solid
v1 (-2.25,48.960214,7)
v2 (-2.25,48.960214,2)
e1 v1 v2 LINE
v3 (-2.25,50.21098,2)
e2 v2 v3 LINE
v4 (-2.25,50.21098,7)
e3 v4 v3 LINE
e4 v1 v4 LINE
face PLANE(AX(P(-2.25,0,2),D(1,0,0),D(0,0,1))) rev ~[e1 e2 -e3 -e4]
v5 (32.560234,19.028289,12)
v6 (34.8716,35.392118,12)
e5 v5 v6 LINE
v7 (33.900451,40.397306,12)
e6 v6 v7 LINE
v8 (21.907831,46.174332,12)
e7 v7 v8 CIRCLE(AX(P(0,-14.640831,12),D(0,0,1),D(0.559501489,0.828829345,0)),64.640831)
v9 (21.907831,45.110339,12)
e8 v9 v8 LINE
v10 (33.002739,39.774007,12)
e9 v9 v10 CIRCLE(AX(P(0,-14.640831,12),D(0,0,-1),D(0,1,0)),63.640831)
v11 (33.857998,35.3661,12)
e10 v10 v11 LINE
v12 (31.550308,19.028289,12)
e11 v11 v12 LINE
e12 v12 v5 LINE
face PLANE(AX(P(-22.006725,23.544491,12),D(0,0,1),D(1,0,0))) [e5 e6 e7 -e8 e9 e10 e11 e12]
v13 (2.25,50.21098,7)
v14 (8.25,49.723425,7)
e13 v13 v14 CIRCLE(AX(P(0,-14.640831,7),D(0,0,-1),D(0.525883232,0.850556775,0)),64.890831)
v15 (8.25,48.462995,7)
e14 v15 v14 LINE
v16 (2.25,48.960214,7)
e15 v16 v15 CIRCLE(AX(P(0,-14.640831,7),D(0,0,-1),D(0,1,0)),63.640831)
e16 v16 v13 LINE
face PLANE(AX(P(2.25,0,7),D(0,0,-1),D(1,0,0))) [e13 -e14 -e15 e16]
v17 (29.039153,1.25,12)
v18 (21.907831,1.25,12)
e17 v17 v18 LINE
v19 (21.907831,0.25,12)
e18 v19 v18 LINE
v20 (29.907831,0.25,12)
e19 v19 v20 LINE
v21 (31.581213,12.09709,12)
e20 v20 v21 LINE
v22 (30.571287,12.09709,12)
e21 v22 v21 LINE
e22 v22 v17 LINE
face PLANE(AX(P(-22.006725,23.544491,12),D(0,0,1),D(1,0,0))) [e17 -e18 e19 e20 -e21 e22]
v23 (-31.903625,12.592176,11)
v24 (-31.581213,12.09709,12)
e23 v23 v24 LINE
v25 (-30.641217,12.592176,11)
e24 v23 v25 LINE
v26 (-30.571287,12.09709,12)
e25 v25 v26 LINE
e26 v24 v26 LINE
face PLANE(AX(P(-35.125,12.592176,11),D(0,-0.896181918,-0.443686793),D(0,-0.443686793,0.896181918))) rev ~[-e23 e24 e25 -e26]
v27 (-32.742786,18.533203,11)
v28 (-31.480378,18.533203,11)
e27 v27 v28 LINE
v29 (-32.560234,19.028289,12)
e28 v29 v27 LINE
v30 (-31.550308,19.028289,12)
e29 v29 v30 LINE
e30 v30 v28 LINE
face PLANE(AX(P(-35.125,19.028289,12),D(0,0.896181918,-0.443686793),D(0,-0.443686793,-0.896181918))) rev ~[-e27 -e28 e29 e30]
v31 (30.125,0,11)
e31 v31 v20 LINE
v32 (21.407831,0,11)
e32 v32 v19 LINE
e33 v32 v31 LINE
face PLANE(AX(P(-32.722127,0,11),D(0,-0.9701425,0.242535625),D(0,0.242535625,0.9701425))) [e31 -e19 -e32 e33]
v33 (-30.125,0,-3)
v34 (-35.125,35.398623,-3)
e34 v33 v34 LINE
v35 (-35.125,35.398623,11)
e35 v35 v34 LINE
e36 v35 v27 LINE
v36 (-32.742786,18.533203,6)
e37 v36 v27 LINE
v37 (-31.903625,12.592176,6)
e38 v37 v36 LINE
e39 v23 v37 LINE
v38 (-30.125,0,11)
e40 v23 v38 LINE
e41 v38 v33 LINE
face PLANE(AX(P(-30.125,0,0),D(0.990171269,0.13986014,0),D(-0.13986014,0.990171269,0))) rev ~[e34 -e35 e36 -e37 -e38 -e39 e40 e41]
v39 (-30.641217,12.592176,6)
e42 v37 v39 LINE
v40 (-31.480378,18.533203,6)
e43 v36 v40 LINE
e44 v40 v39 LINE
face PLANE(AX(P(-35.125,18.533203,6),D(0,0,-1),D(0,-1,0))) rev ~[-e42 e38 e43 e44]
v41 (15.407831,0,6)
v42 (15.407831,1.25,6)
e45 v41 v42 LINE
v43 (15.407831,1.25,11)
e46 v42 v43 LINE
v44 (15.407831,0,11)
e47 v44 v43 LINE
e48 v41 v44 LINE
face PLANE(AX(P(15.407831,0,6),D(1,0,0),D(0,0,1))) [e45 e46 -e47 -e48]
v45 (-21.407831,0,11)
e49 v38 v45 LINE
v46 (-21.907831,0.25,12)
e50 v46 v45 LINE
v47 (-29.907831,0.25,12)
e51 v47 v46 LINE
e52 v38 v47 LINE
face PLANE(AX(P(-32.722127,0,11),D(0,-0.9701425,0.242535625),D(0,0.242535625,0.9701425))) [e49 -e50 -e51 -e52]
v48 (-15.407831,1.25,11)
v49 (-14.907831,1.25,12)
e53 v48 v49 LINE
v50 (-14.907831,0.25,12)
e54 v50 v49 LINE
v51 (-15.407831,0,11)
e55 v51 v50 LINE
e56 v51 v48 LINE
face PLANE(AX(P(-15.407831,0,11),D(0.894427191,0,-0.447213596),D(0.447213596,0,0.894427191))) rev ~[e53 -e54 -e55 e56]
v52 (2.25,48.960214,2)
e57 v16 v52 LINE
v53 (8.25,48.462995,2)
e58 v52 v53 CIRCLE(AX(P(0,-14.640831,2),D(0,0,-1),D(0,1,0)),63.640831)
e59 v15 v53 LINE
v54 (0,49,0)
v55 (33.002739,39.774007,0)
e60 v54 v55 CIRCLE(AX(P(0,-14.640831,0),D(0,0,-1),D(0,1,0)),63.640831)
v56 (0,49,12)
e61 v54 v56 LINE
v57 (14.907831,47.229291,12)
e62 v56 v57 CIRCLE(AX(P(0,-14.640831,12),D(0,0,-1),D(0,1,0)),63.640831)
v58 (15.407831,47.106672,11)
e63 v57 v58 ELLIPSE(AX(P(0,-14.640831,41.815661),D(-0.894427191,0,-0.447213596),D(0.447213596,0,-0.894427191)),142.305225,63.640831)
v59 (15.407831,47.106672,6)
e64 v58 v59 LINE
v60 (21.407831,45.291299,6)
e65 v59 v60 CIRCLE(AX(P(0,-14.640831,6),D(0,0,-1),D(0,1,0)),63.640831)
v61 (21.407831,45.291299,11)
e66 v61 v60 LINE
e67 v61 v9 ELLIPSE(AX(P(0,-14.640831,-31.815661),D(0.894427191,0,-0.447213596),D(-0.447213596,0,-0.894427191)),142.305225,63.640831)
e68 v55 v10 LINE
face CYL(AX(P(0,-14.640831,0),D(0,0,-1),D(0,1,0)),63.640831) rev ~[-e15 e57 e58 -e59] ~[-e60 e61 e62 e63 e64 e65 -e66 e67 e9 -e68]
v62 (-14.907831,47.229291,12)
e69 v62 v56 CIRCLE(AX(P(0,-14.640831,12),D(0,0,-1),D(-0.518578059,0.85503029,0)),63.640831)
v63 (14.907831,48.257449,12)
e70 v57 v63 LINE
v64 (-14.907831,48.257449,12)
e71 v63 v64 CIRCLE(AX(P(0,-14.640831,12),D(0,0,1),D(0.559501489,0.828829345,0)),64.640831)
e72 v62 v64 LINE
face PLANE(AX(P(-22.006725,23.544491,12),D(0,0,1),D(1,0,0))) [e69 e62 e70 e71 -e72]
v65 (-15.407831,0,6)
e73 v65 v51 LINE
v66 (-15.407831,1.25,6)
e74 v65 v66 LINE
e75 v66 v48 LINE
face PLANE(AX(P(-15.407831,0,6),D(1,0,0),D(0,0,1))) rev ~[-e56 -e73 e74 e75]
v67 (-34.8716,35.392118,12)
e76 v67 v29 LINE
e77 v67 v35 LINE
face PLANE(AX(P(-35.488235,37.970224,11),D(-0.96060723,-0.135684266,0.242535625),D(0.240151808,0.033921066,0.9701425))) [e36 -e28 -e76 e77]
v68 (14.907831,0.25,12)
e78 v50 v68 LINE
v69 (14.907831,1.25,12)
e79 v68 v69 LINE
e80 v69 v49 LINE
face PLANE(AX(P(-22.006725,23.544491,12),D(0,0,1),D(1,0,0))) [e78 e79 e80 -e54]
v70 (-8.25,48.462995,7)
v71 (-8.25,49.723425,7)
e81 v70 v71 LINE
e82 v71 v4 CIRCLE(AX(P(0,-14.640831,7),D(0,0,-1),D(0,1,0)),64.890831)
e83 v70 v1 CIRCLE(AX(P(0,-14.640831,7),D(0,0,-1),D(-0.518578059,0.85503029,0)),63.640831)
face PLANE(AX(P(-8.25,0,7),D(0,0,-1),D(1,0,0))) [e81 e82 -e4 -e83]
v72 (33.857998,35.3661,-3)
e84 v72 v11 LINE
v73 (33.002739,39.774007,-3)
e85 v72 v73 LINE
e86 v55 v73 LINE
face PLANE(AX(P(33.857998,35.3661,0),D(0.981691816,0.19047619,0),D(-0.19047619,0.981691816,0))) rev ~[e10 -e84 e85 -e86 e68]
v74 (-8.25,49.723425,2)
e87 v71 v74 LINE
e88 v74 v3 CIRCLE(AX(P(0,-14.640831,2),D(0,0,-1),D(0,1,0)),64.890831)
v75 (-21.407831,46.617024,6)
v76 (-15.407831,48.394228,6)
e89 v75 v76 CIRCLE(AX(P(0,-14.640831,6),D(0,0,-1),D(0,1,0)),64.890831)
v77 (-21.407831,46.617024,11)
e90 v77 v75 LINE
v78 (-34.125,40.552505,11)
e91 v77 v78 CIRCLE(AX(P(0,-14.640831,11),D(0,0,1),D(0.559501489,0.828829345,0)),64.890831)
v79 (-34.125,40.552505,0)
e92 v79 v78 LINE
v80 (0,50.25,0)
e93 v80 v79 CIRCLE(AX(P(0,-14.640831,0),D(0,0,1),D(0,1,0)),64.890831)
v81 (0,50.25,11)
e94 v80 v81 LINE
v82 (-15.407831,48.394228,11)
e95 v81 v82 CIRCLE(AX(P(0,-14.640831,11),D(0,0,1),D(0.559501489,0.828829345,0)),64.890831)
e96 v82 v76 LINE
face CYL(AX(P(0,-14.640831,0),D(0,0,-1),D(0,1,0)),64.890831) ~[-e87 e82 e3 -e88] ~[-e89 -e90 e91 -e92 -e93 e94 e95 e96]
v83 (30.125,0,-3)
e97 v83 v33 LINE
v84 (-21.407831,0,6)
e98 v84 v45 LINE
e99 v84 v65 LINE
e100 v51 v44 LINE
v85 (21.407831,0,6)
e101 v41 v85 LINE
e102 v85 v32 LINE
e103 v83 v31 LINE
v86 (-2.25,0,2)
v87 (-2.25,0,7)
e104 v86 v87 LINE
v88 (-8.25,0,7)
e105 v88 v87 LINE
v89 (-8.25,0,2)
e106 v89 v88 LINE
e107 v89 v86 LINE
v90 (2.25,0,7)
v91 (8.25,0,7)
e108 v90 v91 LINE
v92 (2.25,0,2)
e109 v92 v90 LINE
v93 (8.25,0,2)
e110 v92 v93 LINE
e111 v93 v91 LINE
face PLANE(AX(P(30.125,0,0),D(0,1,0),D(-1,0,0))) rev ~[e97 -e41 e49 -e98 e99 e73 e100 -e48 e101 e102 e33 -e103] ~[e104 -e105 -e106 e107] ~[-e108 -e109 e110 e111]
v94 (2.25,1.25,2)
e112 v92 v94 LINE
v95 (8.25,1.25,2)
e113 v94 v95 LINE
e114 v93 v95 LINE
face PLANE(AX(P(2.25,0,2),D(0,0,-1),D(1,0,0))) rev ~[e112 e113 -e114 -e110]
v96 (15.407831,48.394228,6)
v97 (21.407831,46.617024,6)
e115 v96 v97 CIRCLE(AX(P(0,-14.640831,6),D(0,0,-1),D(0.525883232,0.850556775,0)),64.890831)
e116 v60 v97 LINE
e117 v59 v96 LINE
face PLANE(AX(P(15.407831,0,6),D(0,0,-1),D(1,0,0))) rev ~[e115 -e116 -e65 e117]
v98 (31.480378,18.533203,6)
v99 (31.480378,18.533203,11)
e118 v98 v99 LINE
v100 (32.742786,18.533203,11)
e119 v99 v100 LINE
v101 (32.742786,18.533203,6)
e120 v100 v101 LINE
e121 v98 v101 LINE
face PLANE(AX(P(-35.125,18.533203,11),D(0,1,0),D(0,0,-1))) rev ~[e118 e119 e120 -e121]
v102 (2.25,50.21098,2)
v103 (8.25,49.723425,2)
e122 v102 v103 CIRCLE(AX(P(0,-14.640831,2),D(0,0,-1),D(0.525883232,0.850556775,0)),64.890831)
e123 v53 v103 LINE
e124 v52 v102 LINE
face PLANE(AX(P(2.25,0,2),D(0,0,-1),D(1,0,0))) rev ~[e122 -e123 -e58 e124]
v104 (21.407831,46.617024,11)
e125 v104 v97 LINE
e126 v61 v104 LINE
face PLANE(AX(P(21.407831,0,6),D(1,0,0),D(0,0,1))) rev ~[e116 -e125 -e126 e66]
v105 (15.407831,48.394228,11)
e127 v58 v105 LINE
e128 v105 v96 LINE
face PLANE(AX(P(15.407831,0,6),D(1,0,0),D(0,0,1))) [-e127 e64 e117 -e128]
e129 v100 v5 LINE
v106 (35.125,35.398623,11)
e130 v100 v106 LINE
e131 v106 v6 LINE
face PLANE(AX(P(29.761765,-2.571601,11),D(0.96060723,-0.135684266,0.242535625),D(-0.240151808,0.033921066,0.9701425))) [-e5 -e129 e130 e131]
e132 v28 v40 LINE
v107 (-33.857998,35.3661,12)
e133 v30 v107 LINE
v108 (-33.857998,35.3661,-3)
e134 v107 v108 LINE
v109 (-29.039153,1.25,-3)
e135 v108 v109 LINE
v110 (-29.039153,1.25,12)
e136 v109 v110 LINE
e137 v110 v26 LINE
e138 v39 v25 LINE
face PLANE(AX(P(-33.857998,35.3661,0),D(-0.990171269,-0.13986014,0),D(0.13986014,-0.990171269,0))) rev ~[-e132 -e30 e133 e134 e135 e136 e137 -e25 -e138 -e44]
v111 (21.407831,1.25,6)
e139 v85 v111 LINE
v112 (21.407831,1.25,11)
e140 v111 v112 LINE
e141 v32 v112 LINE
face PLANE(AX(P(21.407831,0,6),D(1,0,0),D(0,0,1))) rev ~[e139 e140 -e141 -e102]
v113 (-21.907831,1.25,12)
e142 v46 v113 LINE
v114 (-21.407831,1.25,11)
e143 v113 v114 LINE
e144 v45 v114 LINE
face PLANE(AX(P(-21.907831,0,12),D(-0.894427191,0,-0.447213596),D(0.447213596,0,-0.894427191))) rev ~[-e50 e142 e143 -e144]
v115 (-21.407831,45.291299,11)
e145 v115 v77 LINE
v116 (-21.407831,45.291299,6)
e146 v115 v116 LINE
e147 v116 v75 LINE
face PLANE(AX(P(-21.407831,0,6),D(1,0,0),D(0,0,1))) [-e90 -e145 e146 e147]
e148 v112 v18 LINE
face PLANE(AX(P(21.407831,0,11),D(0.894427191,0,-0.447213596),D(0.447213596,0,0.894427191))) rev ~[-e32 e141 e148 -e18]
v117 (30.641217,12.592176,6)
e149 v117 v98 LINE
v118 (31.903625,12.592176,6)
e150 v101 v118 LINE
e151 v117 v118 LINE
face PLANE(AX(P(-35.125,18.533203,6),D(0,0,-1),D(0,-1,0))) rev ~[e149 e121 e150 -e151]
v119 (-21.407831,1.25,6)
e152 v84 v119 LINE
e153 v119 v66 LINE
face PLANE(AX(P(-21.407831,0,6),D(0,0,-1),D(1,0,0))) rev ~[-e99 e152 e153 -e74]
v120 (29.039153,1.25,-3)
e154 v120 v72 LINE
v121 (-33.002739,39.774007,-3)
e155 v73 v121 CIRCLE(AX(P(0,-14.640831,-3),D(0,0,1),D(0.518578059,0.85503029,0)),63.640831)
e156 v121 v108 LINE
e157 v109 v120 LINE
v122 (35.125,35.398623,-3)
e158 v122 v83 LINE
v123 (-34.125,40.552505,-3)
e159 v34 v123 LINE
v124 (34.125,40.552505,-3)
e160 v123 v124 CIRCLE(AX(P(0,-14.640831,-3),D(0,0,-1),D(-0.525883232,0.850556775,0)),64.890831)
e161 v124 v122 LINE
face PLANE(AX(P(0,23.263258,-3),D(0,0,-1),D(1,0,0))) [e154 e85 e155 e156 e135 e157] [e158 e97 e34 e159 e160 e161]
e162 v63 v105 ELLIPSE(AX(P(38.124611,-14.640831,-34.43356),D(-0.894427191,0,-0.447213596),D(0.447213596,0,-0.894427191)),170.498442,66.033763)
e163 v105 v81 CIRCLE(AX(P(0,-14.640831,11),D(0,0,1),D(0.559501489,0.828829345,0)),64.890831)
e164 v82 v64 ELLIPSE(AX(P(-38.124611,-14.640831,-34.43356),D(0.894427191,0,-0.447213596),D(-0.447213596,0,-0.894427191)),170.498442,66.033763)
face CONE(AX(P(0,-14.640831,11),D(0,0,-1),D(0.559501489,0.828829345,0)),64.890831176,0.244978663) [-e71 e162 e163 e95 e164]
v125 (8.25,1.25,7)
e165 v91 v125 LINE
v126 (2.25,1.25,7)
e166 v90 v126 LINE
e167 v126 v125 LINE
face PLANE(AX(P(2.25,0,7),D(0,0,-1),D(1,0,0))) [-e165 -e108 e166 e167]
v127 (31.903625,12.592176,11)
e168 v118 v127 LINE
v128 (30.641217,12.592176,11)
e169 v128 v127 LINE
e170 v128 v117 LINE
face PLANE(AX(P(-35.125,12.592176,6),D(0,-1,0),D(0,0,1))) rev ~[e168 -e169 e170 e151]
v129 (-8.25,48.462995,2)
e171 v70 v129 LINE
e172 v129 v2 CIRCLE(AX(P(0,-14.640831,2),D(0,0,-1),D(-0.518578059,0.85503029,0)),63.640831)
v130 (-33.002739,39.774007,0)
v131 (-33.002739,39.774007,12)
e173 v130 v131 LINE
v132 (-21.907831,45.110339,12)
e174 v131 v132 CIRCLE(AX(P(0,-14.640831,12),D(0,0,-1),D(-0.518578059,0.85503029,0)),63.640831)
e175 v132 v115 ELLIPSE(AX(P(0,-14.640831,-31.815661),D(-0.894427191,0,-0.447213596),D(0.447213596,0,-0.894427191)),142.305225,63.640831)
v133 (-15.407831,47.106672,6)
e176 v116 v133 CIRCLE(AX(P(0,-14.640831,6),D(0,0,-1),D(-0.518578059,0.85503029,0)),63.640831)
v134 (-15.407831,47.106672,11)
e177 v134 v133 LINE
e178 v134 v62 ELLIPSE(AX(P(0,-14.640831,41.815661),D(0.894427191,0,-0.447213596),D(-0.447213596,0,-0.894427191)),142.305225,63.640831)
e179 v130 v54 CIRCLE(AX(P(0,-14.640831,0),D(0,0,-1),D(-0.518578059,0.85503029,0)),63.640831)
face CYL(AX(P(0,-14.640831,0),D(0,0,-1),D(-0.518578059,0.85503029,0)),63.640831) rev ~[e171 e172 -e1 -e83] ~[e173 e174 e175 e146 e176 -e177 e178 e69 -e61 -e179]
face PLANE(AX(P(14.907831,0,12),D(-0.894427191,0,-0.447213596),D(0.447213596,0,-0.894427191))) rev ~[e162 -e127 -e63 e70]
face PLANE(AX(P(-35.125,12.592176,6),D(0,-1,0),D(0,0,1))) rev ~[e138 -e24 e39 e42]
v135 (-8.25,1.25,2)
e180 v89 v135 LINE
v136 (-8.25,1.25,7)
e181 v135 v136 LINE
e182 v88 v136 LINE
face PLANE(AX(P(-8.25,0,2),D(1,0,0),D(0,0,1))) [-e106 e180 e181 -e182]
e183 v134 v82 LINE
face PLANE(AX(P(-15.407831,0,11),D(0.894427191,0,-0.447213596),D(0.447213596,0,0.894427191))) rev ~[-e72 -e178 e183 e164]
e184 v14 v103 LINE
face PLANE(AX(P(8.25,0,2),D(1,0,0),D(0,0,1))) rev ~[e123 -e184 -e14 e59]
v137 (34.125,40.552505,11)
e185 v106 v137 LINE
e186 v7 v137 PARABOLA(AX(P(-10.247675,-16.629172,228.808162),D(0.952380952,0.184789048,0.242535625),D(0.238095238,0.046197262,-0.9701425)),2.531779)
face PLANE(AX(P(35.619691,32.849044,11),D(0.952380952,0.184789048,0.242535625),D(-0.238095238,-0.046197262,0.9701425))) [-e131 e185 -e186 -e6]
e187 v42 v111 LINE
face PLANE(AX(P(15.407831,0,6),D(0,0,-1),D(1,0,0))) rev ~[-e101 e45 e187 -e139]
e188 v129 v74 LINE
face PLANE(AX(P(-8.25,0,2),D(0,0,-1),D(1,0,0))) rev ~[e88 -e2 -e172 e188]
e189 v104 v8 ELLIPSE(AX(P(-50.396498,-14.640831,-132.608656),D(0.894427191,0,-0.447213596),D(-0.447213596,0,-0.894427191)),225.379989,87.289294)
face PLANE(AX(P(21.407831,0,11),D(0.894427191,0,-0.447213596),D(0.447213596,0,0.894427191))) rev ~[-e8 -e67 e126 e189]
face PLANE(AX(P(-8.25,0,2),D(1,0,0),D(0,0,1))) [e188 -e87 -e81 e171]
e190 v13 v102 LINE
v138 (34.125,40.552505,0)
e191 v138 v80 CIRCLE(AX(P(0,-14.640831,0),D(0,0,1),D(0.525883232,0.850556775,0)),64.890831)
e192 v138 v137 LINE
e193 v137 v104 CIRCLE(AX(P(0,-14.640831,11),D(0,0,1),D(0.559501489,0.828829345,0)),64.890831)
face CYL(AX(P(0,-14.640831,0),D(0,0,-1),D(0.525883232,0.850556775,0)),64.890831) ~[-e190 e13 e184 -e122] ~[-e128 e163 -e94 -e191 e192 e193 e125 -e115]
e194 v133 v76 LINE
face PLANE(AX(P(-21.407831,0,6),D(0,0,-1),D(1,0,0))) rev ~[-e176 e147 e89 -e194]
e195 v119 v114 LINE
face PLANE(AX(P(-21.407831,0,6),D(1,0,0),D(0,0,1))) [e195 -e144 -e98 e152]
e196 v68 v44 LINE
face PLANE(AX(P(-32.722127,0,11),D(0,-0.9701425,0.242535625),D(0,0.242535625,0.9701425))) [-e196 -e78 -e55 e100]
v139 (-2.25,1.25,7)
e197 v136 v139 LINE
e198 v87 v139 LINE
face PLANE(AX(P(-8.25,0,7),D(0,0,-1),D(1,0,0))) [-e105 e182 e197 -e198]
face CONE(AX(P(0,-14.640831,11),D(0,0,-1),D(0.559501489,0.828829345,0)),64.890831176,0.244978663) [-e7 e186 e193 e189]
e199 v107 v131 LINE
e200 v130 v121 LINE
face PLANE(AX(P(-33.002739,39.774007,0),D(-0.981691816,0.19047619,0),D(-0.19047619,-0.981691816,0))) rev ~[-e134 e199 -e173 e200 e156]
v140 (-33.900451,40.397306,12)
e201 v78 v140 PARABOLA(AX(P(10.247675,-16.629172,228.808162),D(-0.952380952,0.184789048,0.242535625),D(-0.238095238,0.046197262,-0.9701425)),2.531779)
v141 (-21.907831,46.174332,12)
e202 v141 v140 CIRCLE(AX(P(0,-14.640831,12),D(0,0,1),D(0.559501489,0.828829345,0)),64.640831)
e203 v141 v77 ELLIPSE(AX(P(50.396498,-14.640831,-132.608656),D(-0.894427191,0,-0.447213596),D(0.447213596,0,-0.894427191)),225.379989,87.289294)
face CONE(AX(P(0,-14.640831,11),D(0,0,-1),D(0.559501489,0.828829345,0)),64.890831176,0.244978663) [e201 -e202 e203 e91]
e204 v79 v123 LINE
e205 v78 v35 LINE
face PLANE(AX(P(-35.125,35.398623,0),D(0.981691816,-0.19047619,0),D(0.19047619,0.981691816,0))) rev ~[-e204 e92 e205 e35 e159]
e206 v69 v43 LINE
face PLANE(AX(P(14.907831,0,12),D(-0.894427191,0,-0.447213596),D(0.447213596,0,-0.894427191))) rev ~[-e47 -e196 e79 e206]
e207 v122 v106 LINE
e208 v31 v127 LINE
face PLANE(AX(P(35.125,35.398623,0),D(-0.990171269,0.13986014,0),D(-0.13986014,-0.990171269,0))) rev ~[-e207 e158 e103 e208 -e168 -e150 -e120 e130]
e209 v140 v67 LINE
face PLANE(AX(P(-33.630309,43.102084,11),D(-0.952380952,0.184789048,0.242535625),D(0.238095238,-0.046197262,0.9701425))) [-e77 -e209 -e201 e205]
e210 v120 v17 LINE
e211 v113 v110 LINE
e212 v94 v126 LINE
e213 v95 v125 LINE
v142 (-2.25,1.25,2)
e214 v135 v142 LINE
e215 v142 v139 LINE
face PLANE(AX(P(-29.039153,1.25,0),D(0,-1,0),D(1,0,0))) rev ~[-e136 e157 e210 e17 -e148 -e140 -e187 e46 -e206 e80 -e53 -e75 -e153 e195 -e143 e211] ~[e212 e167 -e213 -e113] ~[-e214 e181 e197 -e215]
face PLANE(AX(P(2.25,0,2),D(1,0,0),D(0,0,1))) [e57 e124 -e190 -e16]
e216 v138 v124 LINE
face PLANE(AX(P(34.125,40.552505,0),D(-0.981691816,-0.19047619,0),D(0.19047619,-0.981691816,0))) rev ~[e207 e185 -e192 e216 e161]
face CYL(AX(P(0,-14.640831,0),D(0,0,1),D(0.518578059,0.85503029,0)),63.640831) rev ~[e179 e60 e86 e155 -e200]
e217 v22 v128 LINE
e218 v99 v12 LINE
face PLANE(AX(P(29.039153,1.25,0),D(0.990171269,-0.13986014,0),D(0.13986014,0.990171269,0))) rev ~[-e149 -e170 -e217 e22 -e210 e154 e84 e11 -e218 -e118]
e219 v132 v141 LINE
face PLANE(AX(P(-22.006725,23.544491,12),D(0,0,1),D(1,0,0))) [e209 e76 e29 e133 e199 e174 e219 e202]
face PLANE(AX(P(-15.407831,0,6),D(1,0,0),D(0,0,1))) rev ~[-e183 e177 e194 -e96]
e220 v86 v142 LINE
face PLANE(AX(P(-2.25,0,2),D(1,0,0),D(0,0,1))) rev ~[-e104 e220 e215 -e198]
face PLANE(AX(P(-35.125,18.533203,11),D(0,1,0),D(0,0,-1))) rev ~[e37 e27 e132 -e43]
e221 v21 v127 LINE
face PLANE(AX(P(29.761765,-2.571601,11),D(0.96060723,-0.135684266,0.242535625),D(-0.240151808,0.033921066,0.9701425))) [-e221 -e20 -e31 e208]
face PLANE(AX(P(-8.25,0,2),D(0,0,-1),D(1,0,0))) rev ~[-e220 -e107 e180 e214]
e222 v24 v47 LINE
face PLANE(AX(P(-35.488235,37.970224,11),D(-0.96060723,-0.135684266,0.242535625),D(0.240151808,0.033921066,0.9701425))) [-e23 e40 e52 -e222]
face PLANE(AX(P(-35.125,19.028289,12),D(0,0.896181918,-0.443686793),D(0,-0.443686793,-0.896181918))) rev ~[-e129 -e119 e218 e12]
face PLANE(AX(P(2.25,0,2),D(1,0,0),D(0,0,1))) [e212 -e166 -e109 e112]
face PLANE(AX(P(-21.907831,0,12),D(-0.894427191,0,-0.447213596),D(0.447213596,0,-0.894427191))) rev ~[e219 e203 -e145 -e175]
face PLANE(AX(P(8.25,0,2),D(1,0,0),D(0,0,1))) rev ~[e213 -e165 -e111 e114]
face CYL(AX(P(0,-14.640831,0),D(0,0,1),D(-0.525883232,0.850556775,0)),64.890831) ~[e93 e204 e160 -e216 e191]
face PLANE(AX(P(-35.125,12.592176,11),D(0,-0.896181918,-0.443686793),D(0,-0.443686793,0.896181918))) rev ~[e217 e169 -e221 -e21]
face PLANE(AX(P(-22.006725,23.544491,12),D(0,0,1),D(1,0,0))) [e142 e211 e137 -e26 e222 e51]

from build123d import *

# Parameters (mm, degrees)
F1_DEPTH     = 12
F2_T1_DEPTH  = 40.9442549995
F2_T3_DEPTH  = 65.4442549995
F2_T5_DEPTH  = 40.9442549995
F2_T7_DEPTH  = 10.4442549995
F2_T9_DEPTH  = 10.4442549995
F2_T12_ANGLE = 68.042658845
F3_W         = 6
F3_H         = 5
F4_DEPTH     = 50.251
F8_DEPTH     = 70.251
F10_DEPTH    = 3


# Not quite as in the source:
# - a fillet or chamfer that OpenCascade refuses, or shapes differently, is made with other operations: its cross-section is extruded or revolved along the edge and cut away or added


with BuildPart() as f1:
    # F0 (on Top) → F1 (new body)
    with BuildSketch(Plane.XY):
        with BuildLine():
            Line((-35.125, 35.3986228546), (-30.125, 0))
            Line((-30.125, 0), (0, 0))
            Line((0, 0), (0, 1.25))
            Line((0, 1.25), (-29.0391526732, 1.25))
            Line((-29.0391526732, 1.25), (-33.8579983297, 35.3660999978))
            Line((-33.8579983297, 35.3660999978), (-33.0027387168, 39.7740071493))
            ThreePointArc((-33.0027387168, 39.7740071493), (-17.1340283274, 46.6501181236), (0, 49))
            Line((0, 49), (0, 50.25))
            ThreePointArc((0, 50.25), (-17.738073715, 47.7785625378), (-34.125, 40.5525048866))
            Line((-34.125, 40.5525048866), (-35.125, 35.3986228546))
        make_face()
        with BuildLine():
            Line((0, 1.25), (0, 0))
            Line((0, 0), (30.125, 0))
            Line((30.125, 0), (35.125, 35.3986228546))
            Line((35.125, 35.3986228546), (34.125, 40.5525048866))
            ThreePointArc((34.125, 40.5525048866), (17.738073715, 47.7785625378), (0, 50.25))
            Line((0, 50.25), (0, 49))
            ThreePointArc((0, 49), (17.1340283274, 46.6501181236), (33.0027387168, 39.7740071493))
            Line((33.0027387168, 39.7740071493), (33.8579983297, 35.3660999978))
            Line((33.8579983297, 35.3660999978), (29.0391526732, 1.25))
            Line((29.0391526732, 1.25), (0, 1.25))
        make_face()
    extrude(amount=F1_DEPTH)

    # F2: chamfer of 0.25 x 1 on 6 edges, made by hand

    # F2_s2 → F2_t1 (cut)
    with BuildSketch(Plane(origin=(-5.9525054843, 42.142099336, 0), x_dir=(0, 0, 1), z_dir=(0.1398601399, -0.9901712687, 0))):
        Polygon((11, 29.8289094684), (12, 29.5789094684), (12, 29.8289094684), align=None)
    extrude(amount=F2_T1_DEPTH, mode=Mode.SUBTRACT)

    # F2_s4 → F2_t3 (cut)
    with BuildSketch(Plane.YZ.offset(-32.7221274998)):
        Polygon((0, 11), (0.25, 12), (0, 12), align=None)
    extrude(amount=F2_T3_DEPTH, mode=Mode.SUBTRACT)

    # F2_s6 → F2_t5 (cut)
    with BuildSketch(Plane(origin=(0.2260362536, 1.6002744188, 0), x_dir=(0, 0, 1), z_dir=(0.1398601399, 0.9901712687, 0))):
        Polygon((11, 29.8289094684), (12, 29.5789094684), (12, 29.8289094684), align=None)
    extrude(amount=F2_T5_DEPTH, mode=Mode.SUBTRACT)

    # F2_s8 → F2_t7 (cut)
    with BuildSketch(Plane(origin=(-4.8500827906, 24.9967545481, 0), x_dir=(0, 0, 1), z_dir=(-0.1904761905, 0.9816918156, 0))):
        Polygon((11, 41.2245198532), (12, 40.9745198532), (12, 41.2245198532), align=None)
    extrude(amount=F2_T7_DEPTH, mode=Mode.SUBTRACT)

    # F2_s10 → F2_t9 (cut)
    with BuildSketch(Plane(origin=(6.8394646952, 35.2497942014, 0), x_dir=(0, 0, 1), z_dir=(-0.1904761905, -0.9816918156, 0))):
        Polygon((11, 41.2245198532), (12, 40.9745198532), (12, 41.2245198532), align=None)
    extrude(amount=F2_T9_DEPTH, mode=Mode.SUBTRACT)

    # F2_s11 → F2_t12 (revolve, cut)
    with BuildSketch(Plane(origin=(6.7894109874, -4.5831938529, 0), x_dir=(0, 0, 1), z_dir=(0.8288293451, -0.5595014894, 0))):
        Polygon((11, -52.7560806603), (12, -52.5060806603), (12, -52.7560806603), align=None)
    revolve(axis=Axis((0, -14.6408311763, 12), (0, 0, 1)), revolution_arc=F2_T12_ANGLE, mode=Mode.SUBTRACT)

    # F3 (on face) → F4 (cut, through all)
    with BuildSketch(Plane.XZ):
        with Locations((-18.4078305346, 8.5)):
            Rectangle(F3_W, F3_H)
        Polygon((-21.9078305346, 12), (-21.4078305346, 11), (-15.4078305346, 11), (-14.9078305346, 12), align=None)
        with Locations((18.4078305346, 8.5)):
            Rectangle(F3_W, F3_H)
        Polygon((14.9078305346, 12), (15.4078305346, 11), (21.4078305346, 11), (21.9078305346, 12), align=None)
        with Locations((-5.25, 4.5)):
            Rectangle(F3_W, F3_H)
        with Locations((5.25, 4.5)):
            Rectangle(F3_W, F3_H)
    extrude(amount=-F4_DEPTH, mode=Mode.SUBTRACT)

    # F7 (on face) → F8 (cut, through all)
    with BuildSketch(Plane(origin=(-35.125, 0, 0), x_dir=(0, -1, 0), z_dir=(-1, 0, 0))):
        Polygon((-19.0282890696, 12), (-18.5332034352, 11), (-18.5332034352, 6), (-12.5921758233, 6), (-12.5921758233, 11), (-12.0970901889, 12), align=None)
    extrude(amount=-F8_DEPTH, mode=Mode.SUBTRACT)

    # F9 (on face) + F0 (on Top) → F10 (join)
    with BuildSketch(Plane(origin=(0, 0, 0), x_dir=(1, 0, 0), z_dir=(0, 0, -1))):
        with BuildLine():
            Line((30.125, 0), (-30.125, 0))
            Line((-30.125, 0), (-35.125, -35.3986228546))
            Line((-35.125, -35.3986228546), (-34.125, -40.5525048866))
            ThreePointArc((-34.125, -40.5525048866), (0, -50.25), (34.125, -40.5525048866))
            Line((34.125, -40.5525048866), (35.125, -35.3986228546))
            Line((35.125, -35.3986228546), (30.125, 0))
        make_face()
        with BuildLine():
            Line((-33.8579983297, -35.3660999978), (-29.0391526732, -1.25))
            Line((-29.0391526732, -1.25), (29.0391526732, -1.25))
            Line((29.0391526732, -1.25), (33.8579983297, -35.3660999978))
            Line((33.8579983297, -35.3660999978), (33.0027387168, -39.7740071493))
            ThreePointArc((33.0027387168, -39.7740071493), (0, -49), (-33.0027387168, -39.7740071493))
            Line((-33.0027387168, -39.7740071493), (-33.8579983297, -35.3660999978))
        make_face(mode=Mode.SUBTRACT)
    with BuildSketch(Plane.XY):
        with BuildLine():
            Line((-35.125, 35.3986228546), (-30.125, 0))
            Line((-30.125, 0), (0, 0))
            Line((0, 0), (0, 1.25))
            Line((0, 1.25), (-29.0391526732, 1.25))
            Line((-29.0391526732, 1.25), (-33.8579983297, 35.3660999978))
            Line((-33.8579983297, 35.3660999978), (-33.0027387168, 39.7740071493))
            ThreePointArc((-33.0027387168, 39.7740071493), (-17.1340283274, 46.6501181236), (0, 49))
            Line((0, 49), (0, 50.25))
            ThreePointArc((0, 50.25), (-17.738073715, 47.7785625378), (-34.125, 40.5525048866))
            Line((-34.125, 40.5525048866), (-35.125, 35.3986228546))
        make_face()
        with BuildLine():
            Line((0, 1.25), (0, 0))
            Line((0, 0), (30.125, 0))
            Line((30.125, 0), (35.125, 35.3986228546))
            Line((35.125, 35.3986228546), (34.125, 40.5525048866))
            ThreePointArc((34.125, 40.5525048866), (17.738073715, 47.7785625378), (0, 50.25))
            Line((0, 50.25), (0, 49))
            ThreePointArc((0, 49), (17.1340283274, 46.6501181236), (33.0027387168, 39.7740071493))
            Line((33.0027387168, 39.7740071493), (33.8579983297, 35.3660999978))
            Line((33.8579983297, 35.3660999978), (29.0391526732, 1.25))
            Line((29.0391526732, 1.25), (0, 1.25))
        make_face()
    extrude(amount=F10_DEPTH, dir=(0, 0, -1))


solid = f1.part
